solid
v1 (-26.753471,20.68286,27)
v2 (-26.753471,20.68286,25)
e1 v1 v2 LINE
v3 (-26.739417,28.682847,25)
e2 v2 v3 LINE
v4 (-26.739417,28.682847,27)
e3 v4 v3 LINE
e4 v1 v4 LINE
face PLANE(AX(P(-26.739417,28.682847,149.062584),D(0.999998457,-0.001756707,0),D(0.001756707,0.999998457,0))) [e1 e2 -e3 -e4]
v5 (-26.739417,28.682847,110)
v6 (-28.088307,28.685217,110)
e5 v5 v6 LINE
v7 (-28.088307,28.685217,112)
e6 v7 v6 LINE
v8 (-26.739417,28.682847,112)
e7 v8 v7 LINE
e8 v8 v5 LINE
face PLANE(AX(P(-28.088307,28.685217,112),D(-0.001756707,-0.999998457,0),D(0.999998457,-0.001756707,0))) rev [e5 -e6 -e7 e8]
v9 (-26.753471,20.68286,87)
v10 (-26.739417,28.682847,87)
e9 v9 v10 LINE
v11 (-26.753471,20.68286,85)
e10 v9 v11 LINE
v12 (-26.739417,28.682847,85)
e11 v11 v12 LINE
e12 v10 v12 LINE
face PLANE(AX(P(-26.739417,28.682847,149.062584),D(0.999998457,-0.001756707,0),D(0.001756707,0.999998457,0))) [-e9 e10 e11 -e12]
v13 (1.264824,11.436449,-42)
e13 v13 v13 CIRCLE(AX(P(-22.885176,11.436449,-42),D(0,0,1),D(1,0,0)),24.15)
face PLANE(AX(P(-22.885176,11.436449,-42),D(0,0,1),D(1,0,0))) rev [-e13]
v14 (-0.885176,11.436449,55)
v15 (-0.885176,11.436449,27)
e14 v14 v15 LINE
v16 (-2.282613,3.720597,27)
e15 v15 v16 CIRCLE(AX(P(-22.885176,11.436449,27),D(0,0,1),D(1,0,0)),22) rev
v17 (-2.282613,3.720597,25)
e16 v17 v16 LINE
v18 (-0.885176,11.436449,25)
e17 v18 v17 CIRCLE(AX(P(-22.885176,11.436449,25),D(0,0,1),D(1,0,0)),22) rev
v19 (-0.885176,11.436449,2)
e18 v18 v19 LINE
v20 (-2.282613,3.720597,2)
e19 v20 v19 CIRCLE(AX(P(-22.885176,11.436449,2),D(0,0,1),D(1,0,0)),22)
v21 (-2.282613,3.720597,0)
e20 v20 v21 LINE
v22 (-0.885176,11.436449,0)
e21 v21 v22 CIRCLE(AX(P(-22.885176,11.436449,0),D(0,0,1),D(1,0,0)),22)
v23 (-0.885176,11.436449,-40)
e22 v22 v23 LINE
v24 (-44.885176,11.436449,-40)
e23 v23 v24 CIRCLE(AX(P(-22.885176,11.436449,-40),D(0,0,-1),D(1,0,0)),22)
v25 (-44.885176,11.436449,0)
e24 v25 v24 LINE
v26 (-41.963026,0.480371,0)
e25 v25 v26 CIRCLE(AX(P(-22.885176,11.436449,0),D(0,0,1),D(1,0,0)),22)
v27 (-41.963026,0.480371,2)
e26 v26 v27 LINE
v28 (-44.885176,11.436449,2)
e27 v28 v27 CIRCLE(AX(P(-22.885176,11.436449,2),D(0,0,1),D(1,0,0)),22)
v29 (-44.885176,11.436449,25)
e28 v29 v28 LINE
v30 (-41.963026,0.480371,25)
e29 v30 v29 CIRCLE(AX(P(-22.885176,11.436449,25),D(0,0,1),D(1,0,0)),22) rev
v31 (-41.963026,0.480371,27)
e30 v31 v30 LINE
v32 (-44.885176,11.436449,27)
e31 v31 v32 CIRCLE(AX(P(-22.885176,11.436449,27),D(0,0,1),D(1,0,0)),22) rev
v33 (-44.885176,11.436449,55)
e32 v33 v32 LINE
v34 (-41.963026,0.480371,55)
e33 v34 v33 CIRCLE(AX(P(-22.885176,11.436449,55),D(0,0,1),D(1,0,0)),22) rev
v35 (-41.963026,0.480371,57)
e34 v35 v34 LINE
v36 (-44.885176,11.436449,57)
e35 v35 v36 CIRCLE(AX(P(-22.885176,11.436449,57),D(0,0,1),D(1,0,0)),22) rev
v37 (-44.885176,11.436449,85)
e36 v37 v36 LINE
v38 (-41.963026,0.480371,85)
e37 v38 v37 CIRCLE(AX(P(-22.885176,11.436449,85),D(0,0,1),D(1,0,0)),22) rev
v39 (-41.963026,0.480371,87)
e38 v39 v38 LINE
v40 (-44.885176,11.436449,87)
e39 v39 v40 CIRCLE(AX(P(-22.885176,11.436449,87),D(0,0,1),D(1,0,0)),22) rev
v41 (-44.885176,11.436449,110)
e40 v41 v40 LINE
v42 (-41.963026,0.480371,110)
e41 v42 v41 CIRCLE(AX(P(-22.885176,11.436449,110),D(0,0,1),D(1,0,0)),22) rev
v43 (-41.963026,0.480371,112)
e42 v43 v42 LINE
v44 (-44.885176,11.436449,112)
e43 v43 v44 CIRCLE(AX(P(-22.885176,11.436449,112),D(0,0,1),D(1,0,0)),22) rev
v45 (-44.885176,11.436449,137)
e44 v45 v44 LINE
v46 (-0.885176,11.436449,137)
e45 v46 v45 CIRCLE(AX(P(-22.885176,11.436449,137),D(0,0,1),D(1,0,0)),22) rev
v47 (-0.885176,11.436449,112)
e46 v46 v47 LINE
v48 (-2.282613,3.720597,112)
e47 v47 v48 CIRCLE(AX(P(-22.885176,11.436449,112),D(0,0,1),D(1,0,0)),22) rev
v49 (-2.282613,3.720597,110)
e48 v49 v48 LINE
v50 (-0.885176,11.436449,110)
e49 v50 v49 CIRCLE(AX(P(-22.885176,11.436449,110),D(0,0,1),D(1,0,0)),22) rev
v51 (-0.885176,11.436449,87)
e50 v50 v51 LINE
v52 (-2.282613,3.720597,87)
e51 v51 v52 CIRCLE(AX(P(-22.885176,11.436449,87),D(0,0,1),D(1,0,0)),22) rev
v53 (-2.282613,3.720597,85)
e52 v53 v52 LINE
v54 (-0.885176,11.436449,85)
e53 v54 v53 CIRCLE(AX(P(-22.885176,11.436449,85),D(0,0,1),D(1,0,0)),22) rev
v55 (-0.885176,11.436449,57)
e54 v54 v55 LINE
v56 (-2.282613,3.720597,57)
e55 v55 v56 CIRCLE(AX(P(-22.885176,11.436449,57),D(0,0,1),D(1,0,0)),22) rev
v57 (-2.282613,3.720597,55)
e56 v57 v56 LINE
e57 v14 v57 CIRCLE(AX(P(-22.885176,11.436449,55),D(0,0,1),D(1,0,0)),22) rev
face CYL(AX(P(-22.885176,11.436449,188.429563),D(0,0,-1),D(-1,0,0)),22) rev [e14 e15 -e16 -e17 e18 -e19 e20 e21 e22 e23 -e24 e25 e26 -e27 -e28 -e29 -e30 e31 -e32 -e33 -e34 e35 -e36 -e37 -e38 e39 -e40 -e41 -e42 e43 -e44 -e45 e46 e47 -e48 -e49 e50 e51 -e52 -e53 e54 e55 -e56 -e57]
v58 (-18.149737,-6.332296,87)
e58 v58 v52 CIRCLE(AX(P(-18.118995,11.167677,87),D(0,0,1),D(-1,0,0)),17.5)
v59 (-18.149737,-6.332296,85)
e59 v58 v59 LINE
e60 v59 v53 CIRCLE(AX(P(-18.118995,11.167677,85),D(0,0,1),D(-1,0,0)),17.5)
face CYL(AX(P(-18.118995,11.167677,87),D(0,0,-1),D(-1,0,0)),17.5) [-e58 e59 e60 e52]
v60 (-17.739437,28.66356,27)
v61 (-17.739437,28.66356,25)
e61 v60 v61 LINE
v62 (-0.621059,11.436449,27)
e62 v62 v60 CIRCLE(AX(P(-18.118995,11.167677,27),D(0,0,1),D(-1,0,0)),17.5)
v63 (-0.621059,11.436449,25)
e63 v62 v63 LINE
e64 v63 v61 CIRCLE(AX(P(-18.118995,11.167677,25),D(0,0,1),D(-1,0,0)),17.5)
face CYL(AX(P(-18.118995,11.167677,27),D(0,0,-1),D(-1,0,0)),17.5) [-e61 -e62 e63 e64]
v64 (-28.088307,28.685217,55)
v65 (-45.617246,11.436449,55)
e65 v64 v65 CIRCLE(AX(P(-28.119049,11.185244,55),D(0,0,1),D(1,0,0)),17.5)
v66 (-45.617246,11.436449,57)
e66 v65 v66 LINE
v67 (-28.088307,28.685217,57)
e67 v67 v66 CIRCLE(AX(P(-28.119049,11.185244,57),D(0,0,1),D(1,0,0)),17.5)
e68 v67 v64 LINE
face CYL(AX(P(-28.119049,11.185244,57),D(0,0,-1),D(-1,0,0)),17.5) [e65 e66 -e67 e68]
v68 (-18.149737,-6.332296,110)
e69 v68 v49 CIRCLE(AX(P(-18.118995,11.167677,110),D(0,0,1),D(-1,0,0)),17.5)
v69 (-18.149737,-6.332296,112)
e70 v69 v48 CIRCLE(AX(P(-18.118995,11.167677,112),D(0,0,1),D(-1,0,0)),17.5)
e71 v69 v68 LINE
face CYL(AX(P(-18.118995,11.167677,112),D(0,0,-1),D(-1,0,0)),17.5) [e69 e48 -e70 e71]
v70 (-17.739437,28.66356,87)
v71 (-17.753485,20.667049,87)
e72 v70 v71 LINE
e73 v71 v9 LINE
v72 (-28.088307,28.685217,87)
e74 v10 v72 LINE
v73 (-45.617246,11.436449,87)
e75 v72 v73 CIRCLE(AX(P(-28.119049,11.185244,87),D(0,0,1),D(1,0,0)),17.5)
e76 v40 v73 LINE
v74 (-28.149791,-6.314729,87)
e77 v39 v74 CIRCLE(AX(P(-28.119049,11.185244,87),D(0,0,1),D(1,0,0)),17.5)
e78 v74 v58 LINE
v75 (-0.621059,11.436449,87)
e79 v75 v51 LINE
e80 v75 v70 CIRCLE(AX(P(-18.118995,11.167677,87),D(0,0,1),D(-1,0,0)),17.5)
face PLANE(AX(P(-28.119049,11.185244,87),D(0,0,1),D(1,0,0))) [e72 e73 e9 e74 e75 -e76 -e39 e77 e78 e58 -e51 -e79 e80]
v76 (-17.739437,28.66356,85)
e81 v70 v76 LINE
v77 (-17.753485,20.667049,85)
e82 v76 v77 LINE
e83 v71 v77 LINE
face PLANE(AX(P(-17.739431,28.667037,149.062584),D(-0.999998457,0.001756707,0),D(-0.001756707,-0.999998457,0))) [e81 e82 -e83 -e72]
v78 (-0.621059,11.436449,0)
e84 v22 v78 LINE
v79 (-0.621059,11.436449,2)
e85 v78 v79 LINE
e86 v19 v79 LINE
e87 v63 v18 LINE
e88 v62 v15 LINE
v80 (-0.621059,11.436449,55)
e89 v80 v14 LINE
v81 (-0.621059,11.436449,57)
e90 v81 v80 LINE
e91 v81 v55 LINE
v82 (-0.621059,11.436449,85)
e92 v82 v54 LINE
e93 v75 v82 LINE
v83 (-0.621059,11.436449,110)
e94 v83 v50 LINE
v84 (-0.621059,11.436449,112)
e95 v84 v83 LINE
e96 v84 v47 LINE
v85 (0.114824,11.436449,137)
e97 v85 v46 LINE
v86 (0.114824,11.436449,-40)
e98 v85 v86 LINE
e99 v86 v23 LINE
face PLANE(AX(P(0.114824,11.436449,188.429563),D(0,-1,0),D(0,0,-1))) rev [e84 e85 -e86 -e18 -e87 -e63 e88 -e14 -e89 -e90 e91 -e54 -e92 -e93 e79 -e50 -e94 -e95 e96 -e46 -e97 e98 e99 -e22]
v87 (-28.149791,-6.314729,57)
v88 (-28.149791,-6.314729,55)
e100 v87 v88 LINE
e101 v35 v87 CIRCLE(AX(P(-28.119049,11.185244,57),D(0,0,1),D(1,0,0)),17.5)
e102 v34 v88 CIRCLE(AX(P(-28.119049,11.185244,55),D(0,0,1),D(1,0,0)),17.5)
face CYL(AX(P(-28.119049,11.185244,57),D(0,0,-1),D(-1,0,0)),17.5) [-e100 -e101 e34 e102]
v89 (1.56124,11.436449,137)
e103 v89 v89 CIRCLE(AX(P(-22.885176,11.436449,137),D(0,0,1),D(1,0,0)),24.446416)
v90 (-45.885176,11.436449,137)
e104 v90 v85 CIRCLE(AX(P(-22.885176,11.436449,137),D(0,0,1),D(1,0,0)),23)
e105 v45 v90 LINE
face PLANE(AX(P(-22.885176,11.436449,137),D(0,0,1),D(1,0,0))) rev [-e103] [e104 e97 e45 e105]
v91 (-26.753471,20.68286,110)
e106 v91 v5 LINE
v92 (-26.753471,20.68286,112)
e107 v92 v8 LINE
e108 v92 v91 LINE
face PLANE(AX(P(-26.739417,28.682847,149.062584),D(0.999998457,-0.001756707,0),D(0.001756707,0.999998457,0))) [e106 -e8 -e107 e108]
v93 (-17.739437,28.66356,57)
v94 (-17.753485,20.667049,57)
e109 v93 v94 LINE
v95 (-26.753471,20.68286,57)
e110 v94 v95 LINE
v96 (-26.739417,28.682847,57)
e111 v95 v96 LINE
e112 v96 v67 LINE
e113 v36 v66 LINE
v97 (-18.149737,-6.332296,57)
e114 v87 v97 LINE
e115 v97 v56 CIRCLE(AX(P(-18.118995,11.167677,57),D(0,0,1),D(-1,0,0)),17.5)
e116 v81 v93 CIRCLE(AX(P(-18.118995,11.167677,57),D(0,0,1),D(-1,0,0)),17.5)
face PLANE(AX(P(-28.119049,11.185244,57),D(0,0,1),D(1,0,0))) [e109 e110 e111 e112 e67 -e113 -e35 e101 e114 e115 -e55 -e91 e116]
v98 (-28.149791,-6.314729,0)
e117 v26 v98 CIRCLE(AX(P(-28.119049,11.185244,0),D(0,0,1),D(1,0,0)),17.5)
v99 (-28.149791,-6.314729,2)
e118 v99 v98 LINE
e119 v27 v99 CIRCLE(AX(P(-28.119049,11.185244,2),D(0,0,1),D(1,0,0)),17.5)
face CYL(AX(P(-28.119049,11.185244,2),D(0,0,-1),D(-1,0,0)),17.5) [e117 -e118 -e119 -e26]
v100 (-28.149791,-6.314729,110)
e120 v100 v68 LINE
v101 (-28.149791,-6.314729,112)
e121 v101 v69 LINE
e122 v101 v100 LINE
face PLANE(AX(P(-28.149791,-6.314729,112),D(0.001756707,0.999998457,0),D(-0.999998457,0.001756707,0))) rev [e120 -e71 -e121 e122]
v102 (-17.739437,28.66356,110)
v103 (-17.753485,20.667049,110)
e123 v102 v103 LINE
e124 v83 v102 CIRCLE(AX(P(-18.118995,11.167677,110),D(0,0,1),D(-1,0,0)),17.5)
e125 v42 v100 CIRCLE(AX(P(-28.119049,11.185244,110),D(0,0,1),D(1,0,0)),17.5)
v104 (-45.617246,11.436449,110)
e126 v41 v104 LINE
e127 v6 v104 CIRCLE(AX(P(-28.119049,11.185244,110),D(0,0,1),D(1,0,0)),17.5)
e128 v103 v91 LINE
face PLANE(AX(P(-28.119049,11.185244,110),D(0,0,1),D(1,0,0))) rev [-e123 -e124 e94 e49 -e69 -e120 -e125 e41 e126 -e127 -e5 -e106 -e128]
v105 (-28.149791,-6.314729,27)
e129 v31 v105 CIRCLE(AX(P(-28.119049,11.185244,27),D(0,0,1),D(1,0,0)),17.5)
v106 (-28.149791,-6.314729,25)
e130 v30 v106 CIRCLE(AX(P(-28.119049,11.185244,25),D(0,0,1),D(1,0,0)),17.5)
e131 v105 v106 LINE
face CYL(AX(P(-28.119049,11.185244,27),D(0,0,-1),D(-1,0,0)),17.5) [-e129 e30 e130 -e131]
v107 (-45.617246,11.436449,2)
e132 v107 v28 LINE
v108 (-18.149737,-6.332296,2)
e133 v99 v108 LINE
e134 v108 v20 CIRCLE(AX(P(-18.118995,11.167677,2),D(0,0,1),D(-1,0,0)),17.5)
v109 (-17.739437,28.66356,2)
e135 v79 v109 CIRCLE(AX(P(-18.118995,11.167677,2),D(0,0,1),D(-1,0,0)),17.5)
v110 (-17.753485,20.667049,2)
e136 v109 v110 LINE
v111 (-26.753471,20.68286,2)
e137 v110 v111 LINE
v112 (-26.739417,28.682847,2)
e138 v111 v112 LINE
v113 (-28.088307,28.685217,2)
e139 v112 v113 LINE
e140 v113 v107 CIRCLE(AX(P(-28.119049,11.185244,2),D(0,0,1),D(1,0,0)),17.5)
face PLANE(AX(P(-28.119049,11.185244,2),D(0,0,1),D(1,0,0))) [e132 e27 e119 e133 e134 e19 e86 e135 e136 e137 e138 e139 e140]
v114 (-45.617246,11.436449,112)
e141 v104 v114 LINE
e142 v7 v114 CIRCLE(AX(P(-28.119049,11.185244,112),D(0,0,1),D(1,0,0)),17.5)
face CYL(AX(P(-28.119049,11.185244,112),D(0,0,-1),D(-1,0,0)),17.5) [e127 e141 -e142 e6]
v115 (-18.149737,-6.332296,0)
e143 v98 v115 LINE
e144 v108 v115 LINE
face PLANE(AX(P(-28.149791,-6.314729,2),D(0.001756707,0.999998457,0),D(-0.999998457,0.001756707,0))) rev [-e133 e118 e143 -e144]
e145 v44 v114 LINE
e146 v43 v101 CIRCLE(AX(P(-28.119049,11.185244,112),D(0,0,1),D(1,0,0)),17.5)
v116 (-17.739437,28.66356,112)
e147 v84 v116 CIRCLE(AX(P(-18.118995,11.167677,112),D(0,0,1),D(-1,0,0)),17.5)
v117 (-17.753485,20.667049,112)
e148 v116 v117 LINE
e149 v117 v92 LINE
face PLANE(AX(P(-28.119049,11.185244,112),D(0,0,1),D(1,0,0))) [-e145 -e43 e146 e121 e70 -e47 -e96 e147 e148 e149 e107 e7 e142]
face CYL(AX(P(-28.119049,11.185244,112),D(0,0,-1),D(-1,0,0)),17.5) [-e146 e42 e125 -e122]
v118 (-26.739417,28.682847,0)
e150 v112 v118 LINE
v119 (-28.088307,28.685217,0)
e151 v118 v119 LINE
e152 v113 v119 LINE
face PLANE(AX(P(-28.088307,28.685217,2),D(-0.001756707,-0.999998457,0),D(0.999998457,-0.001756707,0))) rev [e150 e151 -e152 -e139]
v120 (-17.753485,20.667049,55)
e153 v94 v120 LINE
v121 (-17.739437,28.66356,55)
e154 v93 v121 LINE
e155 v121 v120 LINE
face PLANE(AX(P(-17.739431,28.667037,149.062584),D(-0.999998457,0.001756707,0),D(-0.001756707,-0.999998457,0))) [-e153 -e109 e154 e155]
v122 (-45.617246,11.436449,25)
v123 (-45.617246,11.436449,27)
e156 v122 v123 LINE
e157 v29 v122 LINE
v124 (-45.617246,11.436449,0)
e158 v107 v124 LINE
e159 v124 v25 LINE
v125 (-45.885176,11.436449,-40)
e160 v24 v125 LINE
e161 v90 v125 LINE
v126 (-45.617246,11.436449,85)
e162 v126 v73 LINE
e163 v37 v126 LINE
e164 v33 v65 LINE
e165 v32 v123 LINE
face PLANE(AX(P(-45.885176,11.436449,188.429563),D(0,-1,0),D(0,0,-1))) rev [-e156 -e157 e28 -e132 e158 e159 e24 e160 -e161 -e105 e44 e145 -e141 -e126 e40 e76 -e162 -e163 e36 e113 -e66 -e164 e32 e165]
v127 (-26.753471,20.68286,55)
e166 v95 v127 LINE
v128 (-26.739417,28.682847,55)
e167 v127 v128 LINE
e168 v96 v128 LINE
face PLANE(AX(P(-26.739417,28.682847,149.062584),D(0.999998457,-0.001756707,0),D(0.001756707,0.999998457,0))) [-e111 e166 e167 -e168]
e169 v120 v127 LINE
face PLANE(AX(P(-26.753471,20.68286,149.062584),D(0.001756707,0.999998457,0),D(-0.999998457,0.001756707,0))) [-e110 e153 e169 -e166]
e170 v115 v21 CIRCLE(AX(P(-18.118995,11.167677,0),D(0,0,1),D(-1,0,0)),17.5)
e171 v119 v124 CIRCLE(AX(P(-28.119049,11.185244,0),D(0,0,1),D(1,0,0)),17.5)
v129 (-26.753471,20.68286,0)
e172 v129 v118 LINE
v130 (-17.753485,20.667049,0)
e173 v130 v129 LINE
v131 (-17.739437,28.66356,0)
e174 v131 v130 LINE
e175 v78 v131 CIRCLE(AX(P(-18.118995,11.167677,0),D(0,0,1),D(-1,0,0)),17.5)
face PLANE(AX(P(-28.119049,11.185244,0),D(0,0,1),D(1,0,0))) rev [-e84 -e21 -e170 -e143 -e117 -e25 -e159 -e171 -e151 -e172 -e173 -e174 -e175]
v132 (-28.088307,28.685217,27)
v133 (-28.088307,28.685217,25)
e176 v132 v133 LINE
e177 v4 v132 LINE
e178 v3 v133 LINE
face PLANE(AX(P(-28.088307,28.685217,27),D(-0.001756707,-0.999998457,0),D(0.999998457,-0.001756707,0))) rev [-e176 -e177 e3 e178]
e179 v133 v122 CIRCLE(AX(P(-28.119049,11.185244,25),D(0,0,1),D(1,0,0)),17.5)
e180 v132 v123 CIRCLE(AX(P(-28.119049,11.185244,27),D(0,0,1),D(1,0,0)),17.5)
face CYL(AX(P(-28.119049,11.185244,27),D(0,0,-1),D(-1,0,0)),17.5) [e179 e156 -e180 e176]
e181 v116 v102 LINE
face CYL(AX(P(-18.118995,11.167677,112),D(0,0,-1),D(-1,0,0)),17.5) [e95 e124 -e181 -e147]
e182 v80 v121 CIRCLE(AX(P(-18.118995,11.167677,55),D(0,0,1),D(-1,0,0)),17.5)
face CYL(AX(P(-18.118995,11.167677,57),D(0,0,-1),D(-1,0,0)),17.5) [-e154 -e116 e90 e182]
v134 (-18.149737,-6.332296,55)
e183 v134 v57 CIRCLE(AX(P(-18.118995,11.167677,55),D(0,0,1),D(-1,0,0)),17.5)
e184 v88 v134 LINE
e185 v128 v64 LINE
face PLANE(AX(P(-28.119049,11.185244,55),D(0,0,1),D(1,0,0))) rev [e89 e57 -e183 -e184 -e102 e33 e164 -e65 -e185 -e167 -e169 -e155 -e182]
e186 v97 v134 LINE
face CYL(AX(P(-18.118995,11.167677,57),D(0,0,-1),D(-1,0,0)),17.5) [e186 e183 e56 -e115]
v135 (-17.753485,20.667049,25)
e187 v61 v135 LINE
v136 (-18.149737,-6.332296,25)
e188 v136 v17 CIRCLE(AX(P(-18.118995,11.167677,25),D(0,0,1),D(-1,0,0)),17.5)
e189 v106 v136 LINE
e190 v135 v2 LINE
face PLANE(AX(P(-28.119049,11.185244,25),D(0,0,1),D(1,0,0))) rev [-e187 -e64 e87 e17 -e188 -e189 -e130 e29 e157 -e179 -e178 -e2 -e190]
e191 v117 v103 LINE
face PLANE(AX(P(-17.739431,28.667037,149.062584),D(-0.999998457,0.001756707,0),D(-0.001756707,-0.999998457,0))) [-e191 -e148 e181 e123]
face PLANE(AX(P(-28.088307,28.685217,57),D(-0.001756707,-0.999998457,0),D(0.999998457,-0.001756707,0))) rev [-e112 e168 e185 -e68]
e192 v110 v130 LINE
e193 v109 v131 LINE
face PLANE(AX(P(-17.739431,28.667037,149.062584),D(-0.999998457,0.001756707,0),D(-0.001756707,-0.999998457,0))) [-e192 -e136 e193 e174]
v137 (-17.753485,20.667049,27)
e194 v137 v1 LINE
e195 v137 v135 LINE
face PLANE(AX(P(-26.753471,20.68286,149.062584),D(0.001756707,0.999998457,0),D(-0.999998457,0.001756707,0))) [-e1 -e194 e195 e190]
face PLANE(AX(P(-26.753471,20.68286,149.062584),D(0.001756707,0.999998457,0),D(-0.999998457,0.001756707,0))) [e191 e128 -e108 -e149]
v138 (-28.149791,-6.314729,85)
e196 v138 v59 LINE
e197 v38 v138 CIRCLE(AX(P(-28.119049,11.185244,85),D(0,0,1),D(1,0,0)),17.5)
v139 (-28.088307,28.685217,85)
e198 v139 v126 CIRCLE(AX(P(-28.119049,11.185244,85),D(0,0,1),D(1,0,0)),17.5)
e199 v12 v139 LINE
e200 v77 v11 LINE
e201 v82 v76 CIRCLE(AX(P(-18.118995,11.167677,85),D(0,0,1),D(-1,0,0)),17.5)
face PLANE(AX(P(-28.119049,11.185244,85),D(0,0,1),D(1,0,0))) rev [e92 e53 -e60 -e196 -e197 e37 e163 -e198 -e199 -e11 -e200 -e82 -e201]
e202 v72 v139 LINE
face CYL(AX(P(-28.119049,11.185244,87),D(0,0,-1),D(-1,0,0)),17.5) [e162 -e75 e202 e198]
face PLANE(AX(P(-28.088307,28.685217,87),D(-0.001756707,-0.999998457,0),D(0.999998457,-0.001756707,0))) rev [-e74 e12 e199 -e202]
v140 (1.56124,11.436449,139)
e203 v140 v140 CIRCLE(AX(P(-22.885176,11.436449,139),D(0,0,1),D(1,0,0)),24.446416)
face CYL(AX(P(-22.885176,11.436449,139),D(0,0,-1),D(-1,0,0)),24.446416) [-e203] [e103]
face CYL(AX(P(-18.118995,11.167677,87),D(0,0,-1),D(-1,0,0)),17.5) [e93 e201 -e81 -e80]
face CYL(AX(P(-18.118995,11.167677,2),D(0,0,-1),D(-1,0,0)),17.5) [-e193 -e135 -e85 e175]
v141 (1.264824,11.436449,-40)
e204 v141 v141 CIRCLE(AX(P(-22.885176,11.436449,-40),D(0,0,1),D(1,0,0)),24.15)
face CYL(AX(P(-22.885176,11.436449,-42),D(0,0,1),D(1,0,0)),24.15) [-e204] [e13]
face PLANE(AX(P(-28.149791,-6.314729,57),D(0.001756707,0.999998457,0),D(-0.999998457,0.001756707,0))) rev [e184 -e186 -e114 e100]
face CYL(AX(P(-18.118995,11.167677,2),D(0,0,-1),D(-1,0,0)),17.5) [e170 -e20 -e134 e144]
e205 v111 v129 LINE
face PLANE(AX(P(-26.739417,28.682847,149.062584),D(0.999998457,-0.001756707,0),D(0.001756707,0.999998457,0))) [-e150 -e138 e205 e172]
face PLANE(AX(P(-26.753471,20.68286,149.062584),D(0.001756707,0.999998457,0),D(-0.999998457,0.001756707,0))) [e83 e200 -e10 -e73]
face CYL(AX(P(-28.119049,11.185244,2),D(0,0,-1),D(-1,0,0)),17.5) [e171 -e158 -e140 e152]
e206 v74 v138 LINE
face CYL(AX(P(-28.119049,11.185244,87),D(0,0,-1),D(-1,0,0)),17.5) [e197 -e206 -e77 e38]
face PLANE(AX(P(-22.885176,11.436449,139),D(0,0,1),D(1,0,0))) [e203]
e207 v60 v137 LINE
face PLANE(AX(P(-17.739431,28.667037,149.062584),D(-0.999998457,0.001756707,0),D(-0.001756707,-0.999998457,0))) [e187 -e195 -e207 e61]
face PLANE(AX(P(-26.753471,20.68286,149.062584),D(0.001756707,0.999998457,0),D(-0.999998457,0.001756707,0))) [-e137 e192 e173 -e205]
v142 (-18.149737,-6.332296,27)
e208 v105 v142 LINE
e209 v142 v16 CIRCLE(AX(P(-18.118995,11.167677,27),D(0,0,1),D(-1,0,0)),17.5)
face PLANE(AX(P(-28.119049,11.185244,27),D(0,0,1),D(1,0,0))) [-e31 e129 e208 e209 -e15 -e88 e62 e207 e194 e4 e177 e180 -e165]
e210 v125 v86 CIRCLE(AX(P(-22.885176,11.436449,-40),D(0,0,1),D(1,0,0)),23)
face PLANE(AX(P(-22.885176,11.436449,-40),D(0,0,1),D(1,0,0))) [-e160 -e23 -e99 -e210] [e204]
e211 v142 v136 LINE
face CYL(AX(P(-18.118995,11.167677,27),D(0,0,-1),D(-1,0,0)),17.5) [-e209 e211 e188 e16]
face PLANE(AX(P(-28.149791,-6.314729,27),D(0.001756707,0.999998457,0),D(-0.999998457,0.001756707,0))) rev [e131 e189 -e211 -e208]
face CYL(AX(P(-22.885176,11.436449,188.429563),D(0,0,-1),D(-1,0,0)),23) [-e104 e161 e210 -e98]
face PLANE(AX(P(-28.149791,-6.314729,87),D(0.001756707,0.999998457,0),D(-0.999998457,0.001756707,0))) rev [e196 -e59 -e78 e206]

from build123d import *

# Parameters (mm, degrees)
BOSS_EXTRUDE1_DEPTH = 2
LPATTERN1_COUNT     = 2
LPATTERN1_PITCH     = 25
SKETCH7_R           = 24.15
BOSS_EXTRUDE4_DEPTH = 2
LPATTERN2_COUNT     = 3
LPATTERN2_PITCH     = 30
LPATTERN3_START     = 110
LPATTERN3_DEPTH     = 2
SKETCH10_R          = 24.446416427
BOSS_EXTRUDE6_DEPTH = 2
BOSS_EXTRUDE8_DEPTH = 177
CUT_EXTRUDE1_START  = -2
CUT_EXTRUDE1_DEPTH  = 112


# Read off the part's stored shape, not the designer's step: LPattern3
with BuildPart() as part:
    # Sketch2 → Boss-Extrude1 (new body)
    with BuildSketch(Plane.XY):
        with BuildLine():
            Line((-28.088306633, 28.685216936), (-18.088252628, 28.667649742))
            ThreePointArc((-18.088252628, 28.667649742), (-0.619022007, 11.136934368), (-18.14973738, -6.332296253))
            Line((-18.14973738, -6.332296253), (-28.149791386, -6.314729058))
            ThreePointArc((-28.149791386, -6.314729058), (-45.619022007, 11.215986315), (-28.088306633, 28.685216936))
        make_face()
    extrude(amount=BOSS_EXTRUDE1_DEPTH)


with BuildPart() as lpattern1_1:
    # LPattern1: pattern copy
    add(part.part.moved(Location(Vector(0, 0, 1) * (1 * LPATTERN1_PITCH))))


with BuildPart() as body_3:
    # Sketch7 → Boss-Extrude4 (new body)
    with BuildSketch(Plane.XY.offset(-40)):
        with Locations((-22.885176255, 11.436449293)):
            Circle(SKETCH7_R)
    extrude(amount=-BOSS_EXTRUDE4_DEPTH)


with BuildPart() as lpattern2_1:
    # LPattern2: pattern copy
    add(lpattern1_1.part.moved(Location(Vector(0, 0, 1) * (1 * LPATTERN2_PITCH))))


with BuildPart() as lpattern2_2:
    # LPattern2: pattern copy
    add(lpattern1_1.part.moved(Location(Vector(0, 0, 1) * (2 * LPATTERN2_PITCH))))


with BuildPart() as body_6:
    # LPattern3 outline → LPattern3 (new body)
    with BuildSketch(Plane.XY.offset(LPATTERN3_START)):
        with BuildLine():
            ThreePointArc((-28.088306633, 28.685216936), (-45.619022007, 11.215986316), (-28.149791386, -6.314729058))
            Line((-28.149791386, -6.314729058), (-18.14973738, -6.332296253))
            ThreePointArc((-18.14973738, -6.332296253), (-0.619022007, 11.136934369), (-18.088252628, 28.667649742))
            Line((-18.088252628, 28.667649742), (-28.088306633, 28.685216936))
        make_face()
    extrude(amount=LPATTERN3_DEPTH)


with BuildPart() as body_7:
    # Sketch10 → Boss-Extrude6 (new body)
    with BuildSketch(Plane.XY.offset(137)):
        with Locations((-22.885176255, 11.436449293)):
            Circle(SKETCH10_R)
    extrude(amount=BOSS_EXTRUDE6_DEPTH)


with BuildPart() as part_1:
    add(part.part)

    add(lpattern1_1.part)  # Boss-Extrude8 merges LPattern1_1

    add(body_3.part)  # Boss-Extrude8 merges body 3

    add(lpattern2_1.part)  # Boss-Extrude8 merges LPattern2_1

    add(lpattern2_2.part)  # Boss-Extrude8 merges LPattern2_2

    add(body_6.part)  # Boss-Extrude8 merges body 6

    add(body_7.part)  # Boss-Extrude8 merges body 7
    # Sketch8 → Boss-Extrude8 (add)
    with BuildSketch(Plane.XY.offset(-40)):
        with BuildLine():
            Line((-45.885176255, 11.436449293), (-44.885176255, 11.436449293))
            ThreePointArc((-44.885176255, 11.436449293), (-22.885176255, -10.563550707), (-0.885176255, 11.436449293))
            Line((-0.885176255, 11.436449293), (0.114823745, 11.436449293))
            ThreePointArc((0.114823745, 11.436449293), (-22.885176255, -11.563550707), (-45.885176255, 11.436449293))
        make_face()
    extrude(amount=BOSS_EXTRUDE8_DEPTH)

    # Sketch12 → Cut-Extrude1 (cut)
    with BuildSketch(Plane.XY.offset(2).offset(CUT_EXTRUDE1_START)):
        Polygon((-26.739417039, 28.682847328), (-17.739430926, 28.667036963), (-17.753484584, 20.667049308), (-26.753470697, 20.682859673), align=None)
    extrude(amount=CUT_EXTRUDE1_DEPTH, mode=Mode.SUBTRACT)


solid = part_1.part
